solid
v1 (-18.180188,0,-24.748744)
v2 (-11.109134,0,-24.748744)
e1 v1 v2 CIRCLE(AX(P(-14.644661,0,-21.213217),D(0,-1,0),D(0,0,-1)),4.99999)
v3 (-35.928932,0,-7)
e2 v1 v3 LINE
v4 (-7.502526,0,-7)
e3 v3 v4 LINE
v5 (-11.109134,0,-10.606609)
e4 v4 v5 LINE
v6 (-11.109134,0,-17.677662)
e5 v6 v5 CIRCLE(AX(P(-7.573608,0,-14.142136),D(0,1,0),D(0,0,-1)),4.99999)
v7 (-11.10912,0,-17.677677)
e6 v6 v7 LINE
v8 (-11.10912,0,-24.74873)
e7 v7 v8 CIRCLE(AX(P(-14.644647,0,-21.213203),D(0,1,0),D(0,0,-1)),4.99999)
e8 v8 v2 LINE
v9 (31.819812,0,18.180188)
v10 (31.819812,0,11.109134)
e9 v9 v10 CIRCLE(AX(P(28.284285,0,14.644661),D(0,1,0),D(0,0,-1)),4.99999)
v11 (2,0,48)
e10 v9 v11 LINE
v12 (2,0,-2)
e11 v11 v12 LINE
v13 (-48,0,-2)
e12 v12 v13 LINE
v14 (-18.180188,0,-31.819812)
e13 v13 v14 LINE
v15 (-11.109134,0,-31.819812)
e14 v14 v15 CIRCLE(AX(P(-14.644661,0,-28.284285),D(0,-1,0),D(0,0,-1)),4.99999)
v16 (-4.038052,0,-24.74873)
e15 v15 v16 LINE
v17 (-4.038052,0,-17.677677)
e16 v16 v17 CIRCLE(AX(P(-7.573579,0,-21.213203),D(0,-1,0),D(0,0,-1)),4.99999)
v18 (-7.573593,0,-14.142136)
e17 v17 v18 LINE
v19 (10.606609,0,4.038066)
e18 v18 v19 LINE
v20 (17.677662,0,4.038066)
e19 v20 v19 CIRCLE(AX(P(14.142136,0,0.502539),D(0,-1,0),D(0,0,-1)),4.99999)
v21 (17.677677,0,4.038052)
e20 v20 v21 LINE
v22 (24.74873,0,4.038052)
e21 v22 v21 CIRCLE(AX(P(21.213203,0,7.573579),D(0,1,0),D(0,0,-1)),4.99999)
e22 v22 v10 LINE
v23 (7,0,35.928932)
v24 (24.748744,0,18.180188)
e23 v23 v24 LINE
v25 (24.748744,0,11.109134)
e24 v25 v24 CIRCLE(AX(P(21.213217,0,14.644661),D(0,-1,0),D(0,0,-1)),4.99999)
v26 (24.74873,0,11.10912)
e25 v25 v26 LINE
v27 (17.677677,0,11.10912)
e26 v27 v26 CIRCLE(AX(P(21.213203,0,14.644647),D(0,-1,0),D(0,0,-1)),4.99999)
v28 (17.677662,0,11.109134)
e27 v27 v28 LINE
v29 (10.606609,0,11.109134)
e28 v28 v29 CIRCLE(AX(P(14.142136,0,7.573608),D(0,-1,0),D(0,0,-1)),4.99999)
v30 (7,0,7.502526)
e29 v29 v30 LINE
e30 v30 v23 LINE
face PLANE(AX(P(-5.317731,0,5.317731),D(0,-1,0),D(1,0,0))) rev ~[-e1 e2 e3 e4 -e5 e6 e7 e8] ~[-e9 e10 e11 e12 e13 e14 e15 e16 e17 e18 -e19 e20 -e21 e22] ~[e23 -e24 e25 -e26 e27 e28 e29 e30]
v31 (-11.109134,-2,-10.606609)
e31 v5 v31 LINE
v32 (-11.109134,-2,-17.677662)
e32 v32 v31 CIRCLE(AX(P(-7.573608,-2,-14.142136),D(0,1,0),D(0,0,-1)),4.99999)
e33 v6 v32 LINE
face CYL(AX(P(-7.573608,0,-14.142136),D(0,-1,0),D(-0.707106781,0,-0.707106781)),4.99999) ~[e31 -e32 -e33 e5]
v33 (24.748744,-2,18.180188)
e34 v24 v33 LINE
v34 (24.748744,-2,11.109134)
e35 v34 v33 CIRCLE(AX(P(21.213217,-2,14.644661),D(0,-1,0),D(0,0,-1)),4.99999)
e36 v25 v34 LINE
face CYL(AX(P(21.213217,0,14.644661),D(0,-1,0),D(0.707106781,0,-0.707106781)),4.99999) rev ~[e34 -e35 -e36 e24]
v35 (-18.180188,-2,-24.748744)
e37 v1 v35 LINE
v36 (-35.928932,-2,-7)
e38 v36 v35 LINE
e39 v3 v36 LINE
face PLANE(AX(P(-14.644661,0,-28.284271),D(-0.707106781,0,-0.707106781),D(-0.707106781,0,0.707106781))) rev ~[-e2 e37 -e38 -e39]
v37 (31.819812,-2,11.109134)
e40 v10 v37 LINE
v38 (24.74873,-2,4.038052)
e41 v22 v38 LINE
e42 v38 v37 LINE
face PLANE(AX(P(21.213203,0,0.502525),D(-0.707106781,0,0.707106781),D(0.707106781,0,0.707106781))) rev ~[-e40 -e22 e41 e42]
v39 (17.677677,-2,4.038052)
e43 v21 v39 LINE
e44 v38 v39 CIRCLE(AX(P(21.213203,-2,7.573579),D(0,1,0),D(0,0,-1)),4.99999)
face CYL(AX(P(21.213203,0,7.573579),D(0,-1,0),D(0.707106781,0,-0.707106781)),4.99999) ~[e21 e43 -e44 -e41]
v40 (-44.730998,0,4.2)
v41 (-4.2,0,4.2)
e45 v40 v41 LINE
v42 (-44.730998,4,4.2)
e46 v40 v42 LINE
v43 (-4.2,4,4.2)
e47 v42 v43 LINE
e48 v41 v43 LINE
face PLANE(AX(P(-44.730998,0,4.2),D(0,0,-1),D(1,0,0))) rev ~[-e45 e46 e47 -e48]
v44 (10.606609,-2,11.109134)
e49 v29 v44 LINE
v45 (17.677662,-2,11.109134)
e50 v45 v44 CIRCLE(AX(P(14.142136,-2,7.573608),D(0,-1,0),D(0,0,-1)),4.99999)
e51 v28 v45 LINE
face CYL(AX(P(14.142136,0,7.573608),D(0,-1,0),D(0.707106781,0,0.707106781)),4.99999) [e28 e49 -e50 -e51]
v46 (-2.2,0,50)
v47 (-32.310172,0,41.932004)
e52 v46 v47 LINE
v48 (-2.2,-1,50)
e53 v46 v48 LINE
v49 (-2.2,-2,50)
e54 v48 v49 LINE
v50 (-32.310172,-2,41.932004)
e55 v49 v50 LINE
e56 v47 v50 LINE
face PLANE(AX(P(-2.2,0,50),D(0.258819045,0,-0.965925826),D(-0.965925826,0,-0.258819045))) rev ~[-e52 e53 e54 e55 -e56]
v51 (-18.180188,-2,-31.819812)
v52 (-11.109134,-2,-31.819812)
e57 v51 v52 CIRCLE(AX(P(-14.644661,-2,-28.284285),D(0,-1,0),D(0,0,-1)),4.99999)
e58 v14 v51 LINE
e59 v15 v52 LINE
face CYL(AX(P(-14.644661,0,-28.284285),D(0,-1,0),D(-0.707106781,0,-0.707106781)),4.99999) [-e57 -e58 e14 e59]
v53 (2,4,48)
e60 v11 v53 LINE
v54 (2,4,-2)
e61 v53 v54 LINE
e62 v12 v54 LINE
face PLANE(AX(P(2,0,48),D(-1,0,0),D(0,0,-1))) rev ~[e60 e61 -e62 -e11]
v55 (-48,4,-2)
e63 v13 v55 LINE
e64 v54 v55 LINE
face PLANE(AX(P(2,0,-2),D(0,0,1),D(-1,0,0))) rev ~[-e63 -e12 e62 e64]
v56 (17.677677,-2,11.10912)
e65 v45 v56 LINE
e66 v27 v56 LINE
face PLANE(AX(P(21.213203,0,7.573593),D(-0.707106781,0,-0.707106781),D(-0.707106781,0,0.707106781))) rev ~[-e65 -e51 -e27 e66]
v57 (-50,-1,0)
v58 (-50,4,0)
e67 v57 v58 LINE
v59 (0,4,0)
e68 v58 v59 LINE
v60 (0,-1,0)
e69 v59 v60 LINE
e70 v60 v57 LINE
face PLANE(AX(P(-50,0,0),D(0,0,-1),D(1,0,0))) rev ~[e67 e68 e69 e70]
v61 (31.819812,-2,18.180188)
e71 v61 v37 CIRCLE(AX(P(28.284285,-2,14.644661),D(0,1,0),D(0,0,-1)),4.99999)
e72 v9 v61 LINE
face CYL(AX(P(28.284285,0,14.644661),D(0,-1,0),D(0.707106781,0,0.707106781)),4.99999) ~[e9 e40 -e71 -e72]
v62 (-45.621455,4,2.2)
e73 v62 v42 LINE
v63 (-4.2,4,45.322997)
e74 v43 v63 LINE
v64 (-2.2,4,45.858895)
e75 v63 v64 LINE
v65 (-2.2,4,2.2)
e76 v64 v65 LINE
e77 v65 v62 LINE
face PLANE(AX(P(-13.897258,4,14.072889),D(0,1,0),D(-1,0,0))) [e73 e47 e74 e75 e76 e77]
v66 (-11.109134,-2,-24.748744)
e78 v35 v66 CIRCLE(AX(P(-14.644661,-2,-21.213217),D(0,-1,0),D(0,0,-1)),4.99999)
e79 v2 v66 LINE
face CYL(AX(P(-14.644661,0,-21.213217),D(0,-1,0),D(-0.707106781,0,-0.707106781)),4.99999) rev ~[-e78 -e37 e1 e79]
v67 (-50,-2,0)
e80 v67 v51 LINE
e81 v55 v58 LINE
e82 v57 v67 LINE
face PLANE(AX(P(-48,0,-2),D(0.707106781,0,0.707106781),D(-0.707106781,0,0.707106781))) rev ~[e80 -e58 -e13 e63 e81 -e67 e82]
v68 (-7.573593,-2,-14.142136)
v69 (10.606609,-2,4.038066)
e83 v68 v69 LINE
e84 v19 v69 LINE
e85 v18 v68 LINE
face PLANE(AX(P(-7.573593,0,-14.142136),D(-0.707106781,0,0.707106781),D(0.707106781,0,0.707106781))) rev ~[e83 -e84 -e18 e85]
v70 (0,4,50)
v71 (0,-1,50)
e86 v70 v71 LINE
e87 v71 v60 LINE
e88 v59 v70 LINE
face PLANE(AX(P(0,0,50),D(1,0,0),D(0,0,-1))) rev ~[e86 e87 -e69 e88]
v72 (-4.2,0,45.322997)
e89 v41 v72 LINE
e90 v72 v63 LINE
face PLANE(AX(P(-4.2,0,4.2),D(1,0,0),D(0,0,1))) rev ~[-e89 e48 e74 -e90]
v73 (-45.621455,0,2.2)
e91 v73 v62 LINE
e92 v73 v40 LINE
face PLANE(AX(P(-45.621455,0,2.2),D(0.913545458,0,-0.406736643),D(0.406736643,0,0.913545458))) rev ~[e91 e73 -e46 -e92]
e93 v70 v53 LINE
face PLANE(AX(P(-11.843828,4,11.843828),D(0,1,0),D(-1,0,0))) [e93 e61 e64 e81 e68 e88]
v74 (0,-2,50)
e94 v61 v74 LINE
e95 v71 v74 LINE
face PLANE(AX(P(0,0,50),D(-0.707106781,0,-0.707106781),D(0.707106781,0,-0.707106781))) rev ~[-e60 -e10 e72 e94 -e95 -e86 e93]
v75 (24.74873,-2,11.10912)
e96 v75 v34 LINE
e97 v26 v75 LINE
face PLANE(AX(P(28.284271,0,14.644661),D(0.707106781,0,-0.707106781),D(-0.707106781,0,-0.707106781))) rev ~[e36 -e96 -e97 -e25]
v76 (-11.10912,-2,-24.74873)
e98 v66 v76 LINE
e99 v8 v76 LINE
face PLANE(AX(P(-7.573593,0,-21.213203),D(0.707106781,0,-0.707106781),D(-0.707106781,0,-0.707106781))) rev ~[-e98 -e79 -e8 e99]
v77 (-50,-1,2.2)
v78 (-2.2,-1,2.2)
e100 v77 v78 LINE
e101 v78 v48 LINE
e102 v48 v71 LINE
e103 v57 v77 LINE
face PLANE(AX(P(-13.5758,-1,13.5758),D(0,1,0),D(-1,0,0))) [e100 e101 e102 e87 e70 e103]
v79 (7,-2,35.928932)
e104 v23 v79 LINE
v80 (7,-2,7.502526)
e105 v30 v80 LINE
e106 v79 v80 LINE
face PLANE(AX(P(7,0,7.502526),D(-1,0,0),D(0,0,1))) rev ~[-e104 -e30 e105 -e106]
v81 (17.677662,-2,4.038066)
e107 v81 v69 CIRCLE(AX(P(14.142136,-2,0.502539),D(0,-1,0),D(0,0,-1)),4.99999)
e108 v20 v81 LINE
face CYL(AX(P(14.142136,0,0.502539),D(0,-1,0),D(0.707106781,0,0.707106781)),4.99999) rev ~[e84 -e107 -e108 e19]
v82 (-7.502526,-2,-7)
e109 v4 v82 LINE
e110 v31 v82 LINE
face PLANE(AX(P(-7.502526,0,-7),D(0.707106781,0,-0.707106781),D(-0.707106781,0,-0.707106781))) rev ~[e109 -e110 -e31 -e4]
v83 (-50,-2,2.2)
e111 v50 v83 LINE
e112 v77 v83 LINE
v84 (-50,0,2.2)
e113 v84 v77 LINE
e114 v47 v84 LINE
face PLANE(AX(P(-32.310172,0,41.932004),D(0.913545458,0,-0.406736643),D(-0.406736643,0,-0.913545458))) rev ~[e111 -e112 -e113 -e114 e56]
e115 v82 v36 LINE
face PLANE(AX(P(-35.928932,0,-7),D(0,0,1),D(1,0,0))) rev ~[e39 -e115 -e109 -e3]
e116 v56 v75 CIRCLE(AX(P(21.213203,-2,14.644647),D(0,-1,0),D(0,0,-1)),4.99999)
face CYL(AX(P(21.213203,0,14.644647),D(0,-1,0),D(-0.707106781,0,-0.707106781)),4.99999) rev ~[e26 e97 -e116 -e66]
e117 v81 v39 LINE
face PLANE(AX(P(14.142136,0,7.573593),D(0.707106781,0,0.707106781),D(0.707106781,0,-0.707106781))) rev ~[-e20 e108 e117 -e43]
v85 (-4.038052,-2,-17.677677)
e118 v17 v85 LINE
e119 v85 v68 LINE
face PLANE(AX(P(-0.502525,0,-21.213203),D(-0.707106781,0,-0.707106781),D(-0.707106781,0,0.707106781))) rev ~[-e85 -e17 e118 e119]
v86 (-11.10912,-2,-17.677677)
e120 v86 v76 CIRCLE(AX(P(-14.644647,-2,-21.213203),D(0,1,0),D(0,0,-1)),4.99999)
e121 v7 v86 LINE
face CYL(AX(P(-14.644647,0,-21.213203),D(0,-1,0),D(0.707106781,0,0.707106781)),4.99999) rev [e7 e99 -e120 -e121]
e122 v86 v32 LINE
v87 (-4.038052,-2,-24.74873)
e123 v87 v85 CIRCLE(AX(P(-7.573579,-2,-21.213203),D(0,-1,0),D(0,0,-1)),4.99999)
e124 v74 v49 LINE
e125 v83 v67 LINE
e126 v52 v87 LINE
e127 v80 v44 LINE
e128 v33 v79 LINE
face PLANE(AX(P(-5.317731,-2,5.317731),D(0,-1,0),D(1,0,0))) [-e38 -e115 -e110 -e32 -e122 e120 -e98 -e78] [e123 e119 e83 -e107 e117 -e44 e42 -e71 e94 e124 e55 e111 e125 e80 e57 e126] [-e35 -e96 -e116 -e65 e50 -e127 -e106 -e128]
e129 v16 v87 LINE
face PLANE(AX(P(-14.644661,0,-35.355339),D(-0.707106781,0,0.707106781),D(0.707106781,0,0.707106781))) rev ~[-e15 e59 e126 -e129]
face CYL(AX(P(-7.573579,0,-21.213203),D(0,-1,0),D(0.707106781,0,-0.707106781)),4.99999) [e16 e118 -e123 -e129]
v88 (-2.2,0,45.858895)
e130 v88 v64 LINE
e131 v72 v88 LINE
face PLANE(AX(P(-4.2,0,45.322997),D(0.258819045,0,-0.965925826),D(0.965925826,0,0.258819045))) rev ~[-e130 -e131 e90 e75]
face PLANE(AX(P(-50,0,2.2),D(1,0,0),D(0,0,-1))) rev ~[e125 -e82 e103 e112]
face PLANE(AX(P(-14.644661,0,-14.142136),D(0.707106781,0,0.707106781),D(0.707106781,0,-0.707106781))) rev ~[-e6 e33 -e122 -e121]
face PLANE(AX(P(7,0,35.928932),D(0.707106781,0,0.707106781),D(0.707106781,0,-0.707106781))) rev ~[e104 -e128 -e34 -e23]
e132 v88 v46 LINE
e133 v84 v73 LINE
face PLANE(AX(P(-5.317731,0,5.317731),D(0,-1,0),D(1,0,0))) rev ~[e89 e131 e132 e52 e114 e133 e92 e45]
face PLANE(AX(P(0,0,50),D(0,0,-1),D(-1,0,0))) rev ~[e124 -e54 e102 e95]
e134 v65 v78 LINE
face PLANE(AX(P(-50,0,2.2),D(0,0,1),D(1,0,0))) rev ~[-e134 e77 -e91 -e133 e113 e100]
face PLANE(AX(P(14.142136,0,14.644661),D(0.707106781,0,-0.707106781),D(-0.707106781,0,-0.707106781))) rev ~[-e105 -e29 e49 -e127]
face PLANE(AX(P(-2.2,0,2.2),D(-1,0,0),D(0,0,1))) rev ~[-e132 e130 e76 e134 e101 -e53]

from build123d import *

# Parameters (mm, degrees)
F1_DEPTH = 2
F3_DEPTH = 4
F5_DEPTH = 25
F6_R     = 4.99999
F8_DEPTH = 1


# Not quite as in the source:
# - a fillet or chamfer is up to 0.001 mm smaller than in the source, because OpenCascade refuses the exact size


with BuildPart() as f1:
    # F0 (on Front) → F1 (new body)
    with BuildSketch(Plane.XZ):
        Polygon((-50, 2.2), (-50, 0), (-14.6446609407, -35.3553390593), (-0.5025253169, -21.2132034356), (-7.5735931288, -14.1421356237), (14.1421356237, 7.5735931288), (21.2132034356, 0.5025253169), (35.3553390593, 14.6446609407), (0, 50), (-2.2, 50), (-2.2, 2.2), align=None)
        Polygon((-32.3101722444, 41.9320036632), (-50, 2.2), (-2.2, 2.2), (-2.2, 50), align=None)
    extrude(amount=F1_DEPTH)

    # F2 (on face) → F3 (join)
    with BuildSketch(Plane(origin=(0, 0, 0), x_dir=(-1, 0, 0), z_dir=(0, 1, 0))):
        Polygon((0, 0), (0, 50), (-2, 48), (-2, -2), (48, -2), (50, 0), align=None)
        Polygon((4.2, 45.3229968935), (2.2, 45.8588952784), (2.2, 2.2), (45.621454886, 2.2), (44.7309975154, 4.2), (4.2, 4.2), align=None)
    extrude(amount=F3_DEPTH)

    # F4 (on face) → F5 (cut)
    with BuildSketch(Plane(origin=(0, 0, 0), x_dir=(-1, 0, 0), z_dir=(0, 1, 0))):
        Polygon((7.5735934344, -21.2132034356), (14.6446609407, -28.2842709419), (35.9289316665, -7.0000002161), (7.5025258386, -7.0000002161), (14.6446612462, -14.1421356237), align=None)
        Polygon((-14.1421356237, 14.6446612462), (-7.0000002161, 7.5025258386), (-7.0000002161, 35.9289316665), (-28.2842709419, 14.6446609407), (-21.2132034356, 7.5735934344), align=None)
    extrude(amount=-F5_DEPTH, mode=Mode.SUBTRACT)

    # F6 (radius 5 in the source; OpenCascade refuses exactly that, so slightly less here)
    f6_edges = [f1.edges().sort_by_distance(p)[0] for p in [
        (35.355339, -1, 14.644661),
        (21.213203, -1, 0.502525),
        (-14.644661, -1, -35.355339),
        (-0.502525, -1, -21.213203),
        (-14.644661, -1, -14.142136),
        (14.142136, -1, 14.644661),
        (14.142136, -1, 7.573593),
        (21.213203, -1, 7.573593),
        (28.284271, -1, 14.644661),
        (-14.644661, -1, -28.284271),
        (-7.573593, -1, -21.213203),
    ]]
    fillet(f6_edges, radius=F6_R)

    # F7 (on face) → F8 (cut)
    with BuildSketch(Plane(origin=(0, 0, 0), x_dir=(-1, 0, 0), z_dir=(0, 1, 0))):
        Polygon((2.2, 50), (0, 50), (0, 0), (50, 0), (50, 2.2), (45.621454886, 2.2), (2.2, 2.2), (2.2, 45.8588952784), align=None)
    extrude(amount=-F8_DEPTH, mode=Mode.SUBTRACT)


solid = f1.part
